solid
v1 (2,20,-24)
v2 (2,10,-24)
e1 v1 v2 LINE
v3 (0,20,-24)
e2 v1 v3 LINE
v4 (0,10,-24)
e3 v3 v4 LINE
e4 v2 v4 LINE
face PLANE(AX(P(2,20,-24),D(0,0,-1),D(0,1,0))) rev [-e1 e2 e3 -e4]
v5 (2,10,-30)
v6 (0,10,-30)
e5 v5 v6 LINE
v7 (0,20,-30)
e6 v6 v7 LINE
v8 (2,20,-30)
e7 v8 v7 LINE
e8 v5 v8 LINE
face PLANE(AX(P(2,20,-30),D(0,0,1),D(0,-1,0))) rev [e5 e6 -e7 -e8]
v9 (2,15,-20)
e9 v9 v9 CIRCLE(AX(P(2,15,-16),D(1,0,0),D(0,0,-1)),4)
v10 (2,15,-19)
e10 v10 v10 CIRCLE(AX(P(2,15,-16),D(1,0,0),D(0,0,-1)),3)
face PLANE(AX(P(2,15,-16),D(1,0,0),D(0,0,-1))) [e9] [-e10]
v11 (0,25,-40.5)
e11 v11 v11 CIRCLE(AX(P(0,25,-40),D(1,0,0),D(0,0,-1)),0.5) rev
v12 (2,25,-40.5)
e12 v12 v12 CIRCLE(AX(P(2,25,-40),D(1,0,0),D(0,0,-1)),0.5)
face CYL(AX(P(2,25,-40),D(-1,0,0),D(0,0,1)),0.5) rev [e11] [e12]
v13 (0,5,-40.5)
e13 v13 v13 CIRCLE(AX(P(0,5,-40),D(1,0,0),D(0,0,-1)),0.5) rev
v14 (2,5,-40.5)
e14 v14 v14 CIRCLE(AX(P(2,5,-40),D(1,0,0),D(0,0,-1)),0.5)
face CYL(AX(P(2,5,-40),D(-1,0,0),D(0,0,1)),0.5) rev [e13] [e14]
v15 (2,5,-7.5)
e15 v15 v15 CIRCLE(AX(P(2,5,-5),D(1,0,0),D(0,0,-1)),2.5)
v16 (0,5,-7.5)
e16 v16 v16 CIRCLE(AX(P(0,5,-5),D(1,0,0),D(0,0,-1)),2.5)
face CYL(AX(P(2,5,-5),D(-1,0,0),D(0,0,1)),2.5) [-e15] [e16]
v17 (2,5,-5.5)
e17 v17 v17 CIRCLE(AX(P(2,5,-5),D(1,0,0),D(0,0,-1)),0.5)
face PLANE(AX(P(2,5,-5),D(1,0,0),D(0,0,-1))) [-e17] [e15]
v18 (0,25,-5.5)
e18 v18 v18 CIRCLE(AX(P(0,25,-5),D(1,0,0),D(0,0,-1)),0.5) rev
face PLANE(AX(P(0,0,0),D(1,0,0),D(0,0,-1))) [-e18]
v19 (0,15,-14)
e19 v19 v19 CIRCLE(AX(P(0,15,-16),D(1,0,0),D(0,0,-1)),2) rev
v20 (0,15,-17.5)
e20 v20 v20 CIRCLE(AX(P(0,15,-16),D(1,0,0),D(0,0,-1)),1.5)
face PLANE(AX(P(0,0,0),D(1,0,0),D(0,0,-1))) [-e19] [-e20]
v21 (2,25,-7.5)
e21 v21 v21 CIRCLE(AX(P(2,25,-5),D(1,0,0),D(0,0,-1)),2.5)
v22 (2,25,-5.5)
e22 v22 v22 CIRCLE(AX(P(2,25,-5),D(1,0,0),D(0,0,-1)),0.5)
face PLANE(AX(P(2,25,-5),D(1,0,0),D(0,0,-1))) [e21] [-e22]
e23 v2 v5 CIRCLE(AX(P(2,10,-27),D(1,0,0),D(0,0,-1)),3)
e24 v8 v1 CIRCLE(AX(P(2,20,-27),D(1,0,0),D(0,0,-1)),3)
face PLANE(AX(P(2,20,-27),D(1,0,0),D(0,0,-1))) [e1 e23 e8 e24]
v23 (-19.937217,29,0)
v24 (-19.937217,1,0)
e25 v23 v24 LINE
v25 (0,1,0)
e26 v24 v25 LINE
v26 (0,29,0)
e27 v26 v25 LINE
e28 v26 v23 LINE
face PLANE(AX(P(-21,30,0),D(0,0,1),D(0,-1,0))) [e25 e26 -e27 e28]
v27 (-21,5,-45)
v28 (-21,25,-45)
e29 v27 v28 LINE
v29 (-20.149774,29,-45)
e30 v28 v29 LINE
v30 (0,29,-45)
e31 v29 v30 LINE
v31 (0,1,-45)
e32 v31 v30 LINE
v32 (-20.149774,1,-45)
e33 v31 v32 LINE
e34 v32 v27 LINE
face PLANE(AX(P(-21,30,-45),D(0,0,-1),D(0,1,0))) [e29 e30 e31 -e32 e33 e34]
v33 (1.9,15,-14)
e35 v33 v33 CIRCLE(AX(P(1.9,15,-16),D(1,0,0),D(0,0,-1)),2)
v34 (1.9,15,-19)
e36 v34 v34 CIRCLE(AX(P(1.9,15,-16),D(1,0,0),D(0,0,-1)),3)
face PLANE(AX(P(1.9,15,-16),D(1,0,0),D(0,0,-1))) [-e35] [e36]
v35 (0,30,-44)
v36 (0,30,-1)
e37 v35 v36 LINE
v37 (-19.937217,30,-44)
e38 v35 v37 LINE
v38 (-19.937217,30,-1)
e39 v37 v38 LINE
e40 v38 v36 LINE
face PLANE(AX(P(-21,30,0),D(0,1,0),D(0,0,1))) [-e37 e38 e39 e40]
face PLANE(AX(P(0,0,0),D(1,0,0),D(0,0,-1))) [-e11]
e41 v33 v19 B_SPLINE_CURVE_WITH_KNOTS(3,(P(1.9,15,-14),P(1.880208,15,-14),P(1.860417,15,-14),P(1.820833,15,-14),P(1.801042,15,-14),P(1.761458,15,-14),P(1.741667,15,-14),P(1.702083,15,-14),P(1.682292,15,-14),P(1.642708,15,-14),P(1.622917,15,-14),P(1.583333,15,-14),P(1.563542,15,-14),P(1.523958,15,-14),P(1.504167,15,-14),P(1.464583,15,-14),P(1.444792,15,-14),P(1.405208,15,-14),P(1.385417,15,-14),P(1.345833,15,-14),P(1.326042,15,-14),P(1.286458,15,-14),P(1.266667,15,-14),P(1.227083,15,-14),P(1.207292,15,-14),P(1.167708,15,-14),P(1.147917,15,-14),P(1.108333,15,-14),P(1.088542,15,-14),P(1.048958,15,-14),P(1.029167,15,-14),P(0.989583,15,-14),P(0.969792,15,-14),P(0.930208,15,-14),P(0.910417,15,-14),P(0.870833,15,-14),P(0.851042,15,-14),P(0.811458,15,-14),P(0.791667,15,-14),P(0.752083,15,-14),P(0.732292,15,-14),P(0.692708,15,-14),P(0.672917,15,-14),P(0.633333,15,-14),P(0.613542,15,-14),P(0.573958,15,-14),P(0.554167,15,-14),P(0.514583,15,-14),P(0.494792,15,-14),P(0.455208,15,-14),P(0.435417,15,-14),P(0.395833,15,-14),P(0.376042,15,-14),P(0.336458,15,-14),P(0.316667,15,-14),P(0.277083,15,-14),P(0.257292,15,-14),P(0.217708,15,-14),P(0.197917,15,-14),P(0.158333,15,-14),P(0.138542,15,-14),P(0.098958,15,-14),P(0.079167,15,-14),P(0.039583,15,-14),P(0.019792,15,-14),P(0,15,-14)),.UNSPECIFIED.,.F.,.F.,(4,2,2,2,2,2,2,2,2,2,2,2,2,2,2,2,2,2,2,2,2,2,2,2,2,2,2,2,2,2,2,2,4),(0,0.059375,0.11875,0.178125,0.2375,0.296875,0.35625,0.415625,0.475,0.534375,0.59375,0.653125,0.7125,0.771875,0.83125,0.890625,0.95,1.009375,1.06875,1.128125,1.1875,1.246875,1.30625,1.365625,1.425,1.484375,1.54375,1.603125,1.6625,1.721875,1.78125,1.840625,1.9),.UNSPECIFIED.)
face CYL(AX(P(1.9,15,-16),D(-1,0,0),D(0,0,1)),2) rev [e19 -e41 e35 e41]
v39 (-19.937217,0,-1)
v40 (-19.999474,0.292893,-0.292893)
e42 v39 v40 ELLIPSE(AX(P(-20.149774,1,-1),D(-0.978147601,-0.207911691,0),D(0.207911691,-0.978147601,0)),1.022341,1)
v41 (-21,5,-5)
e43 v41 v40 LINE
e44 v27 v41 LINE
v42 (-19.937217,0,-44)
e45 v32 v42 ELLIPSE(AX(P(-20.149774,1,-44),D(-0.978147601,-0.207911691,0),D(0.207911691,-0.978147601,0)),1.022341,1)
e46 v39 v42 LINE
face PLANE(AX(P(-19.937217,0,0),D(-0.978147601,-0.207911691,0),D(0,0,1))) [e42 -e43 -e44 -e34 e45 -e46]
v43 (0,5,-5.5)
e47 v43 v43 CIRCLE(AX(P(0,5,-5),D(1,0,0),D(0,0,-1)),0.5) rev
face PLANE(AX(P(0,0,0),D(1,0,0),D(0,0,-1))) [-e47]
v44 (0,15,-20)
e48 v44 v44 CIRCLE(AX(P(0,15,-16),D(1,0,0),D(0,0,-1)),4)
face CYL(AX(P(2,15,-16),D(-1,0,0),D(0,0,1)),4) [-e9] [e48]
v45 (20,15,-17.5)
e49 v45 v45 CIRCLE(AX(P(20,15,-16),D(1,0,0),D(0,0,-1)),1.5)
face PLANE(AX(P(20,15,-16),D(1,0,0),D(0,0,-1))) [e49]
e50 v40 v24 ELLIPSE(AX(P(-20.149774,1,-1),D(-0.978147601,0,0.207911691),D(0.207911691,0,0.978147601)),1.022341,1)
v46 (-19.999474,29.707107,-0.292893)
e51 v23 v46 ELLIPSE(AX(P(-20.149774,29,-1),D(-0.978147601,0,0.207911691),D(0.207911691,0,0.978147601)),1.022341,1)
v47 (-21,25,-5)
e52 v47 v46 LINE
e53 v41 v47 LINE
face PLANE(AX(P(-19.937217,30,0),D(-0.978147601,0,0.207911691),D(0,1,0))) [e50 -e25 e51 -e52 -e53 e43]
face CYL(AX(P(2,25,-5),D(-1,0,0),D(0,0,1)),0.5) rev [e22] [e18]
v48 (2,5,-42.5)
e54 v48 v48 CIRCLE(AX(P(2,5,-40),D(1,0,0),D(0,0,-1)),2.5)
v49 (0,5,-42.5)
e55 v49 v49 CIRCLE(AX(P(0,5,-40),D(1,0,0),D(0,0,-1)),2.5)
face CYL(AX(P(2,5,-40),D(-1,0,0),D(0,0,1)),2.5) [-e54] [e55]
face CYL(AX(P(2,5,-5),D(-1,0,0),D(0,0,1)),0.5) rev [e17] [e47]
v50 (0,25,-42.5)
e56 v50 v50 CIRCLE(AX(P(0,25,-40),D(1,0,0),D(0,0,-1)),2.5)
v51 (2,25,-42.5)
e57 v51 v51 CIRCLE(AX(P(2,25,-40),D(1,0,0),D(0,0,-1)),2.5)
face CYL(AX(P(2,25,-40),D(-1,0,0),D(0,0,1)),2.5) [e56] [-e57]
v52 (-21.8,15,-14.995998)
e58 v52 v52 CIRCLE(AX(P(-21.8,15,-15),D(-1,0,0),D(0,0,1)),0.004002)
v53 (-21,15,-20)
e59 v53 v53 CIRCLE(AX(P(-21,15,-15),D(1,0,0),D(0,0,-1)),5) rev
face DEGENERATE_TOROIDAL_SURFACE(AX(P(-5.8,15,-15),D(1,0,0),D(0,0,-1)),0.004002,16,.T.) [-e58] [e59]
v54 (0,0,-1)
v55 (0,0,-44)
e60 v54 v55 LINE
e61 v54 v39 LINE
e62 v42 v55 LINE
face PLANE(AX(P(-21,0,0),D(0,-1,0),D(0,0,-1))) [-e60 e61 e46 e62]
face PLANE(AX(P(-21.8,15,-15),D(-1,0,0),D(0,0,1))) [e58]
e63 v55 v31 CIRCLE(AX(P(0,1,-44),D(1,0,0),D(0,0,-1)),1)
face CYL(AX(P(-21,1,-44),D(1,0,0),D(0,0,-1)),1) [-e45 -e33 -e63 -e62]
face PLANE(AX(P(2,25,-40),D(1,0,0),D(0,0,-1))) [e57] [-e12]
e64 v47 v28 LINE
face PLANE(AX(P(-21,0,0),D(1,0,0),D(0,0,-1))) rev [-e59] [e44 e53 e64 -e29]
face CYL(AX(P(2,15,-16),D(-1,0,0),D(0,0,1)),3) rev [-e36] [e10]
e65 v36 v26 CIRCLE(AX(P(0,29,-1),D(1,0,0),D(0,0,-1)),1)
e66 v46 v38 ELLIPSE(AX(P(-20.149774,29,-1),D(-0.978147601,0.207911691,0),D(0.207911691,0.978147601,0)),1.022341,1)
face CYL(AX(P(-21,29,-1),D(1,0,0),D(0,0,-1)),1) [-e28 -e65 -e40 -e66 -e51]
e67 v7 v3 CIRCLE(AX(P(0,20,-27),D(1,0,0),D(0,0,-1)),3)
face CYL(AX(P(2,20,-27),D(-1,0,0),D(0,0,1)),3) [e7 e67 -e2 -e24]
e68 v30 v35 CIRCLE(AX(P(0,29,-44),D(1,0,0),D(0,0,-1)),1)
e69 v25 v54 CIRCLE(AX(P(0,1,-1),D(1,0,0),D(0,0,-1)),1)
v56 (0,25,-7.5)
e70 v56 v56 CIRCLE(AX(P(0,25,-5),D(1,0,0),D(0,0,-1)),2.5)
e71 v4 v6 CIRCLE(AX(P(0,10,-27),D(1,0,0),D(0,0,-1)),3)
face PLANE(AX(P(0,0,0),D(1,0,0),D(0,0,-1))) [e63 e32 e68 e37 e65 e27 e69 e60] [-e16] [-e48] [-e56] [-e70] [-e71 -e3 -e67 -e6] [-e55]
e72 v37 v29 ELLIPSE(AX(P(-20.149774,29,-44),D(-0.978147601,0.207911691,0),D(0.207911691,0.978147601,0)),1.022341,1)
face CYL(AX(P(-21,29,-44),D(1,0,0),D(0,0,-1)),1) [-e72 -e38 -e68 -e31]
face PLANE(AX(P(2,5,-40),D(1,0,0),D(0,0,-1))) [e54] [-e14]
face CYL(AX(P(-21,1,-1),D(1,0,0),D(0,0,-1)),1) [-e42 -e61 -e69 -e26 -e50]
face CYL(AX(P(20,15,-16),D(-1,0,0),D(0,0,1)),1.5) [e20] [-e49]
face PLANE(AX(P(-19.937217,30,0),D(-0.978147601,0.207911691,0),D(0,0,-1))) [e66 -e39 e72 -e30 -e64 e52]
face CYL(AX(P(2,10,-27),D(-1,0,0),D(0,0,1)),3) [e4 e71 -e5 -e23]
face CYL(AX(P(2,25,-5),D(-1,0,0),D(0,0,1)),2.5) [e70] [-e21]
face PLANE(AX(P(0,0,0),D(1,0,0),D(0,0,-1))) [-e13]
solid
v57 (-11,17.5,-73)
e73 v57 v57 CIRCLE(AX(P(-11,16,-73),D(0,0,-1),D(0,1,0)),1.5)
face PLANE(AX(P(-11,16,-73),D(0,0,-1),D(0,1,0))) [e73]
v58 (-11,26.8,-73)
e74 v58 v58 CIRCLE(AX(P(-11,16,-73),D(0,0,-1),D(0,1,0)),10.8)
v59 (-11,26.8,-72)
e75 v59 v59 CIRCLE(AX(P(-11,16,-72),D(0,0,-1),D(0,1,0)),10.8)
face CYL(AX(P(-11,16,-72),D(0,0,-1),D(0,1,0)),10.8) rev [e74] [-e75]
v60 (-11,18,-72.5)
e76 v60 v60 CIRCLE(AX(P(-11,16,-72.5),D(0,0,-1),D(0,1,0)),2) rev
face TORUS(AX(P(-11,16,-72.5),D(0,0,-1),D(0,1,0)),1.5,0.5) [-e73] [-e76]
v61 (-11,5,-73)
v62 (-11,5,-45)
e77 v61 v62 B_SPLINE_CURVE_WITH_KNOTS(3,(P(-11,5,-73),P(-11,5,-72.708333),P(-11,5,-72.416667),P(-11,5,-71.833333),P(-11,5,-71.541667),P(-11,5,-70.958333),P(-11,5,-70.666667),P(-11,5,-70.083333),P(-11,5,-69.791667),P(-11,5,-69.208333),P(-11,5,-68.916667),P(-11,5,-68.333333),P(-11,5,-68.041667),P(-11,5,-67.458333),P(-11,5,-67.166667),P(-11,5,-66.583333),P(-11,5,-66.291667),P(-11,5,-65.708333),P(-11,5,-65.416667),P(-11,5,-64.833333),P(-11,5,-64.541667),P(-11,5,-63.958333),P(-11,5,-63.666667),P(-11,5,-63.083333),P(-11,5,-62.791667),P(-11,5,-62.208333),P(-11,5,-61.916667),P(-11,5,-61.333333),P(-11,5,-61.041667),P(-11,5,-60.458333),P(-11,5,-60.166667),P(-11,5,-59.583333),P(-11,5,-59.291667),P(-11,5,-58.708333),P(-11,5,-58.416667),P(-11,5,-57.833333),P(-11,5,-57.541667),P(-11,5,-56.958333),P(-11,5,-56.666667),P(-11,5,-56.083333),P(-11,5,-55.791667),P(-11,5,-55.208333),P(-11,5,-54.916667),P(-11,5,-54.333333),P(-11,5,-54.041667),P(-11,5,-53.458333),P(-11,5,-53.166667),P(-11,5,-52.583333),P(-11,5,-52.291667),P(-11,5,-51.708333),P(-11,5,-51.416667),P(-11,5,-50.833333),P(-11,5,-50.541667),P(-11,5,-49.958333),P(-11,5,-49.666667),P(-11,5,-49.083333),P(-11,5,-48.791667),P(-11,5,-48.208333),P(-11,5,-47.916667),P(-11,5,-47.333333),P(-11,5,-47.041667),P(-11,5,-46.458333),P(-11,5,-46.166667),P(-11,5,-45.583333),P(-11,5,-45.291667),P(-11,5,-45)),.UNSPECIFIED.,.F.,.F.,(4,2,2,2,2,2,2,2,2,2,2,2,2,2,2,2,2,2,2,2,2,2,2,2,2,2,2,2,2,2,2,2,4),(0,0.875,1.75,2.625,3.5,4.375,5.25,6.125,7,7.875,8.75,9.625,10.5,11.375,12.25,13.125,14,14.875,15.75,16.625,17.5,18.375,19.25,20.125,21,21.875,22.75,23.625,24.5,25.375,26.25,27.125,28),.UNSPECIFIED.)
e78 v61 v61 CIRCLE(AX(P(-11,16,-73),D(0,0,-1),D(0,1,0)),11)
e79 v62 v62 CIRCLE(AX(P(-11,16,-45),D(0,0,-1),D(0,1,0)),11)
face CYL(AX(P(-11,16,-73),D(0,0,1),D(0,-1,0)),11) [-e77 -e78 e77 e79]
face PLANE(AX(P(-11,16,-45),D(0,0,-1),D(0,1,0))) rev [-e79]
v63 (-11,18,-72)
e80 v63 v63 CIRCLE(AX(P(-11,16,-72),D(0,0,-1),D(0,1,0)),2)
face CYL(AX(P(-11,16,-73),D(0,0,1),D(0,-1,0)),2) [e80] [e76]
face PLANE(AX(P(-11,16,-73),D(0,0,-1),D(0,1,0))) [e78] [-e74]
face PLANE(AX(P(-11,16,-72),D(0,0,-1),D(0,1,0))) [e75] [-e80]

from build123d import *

# Parameters (mm, degrees)
SKETCH1_W           = 45
SKETCH1_H           = 30
BOSS_EXTRUDE1_DEPTH = 21
SKETCH2_R           = 2.5
SKETCH2_R_2         = 0.5
SKETCH2_R_3         = 4
SKETCH2_R_4         = 3
BOSS_EXTRUDE2_DEPTH = 2
SKETCH3_R           = 3
SKETCH3_R_2         = 2
BOSS_EXTRUDE3_DEPTH = 1.9
SKETCH4_R           = 1.5
BOSS_EXTRUDE4_DEPTH = 20
BOSS_EXTRUDE5_DEPTH = 2
CHAMFER1_SIZE       = 5
CHAMFER1_SIZE2      = 1.062782808
SKETCH7_R           = 5
BOSS_EXTRUDE6_DEPTH = 0.8
FILLET2_R           = 16
SKETCH8_R           = 11
BOSS_EXTRUDE7_DEPTH = 28
SKETCH9_R           = 10.8
CUT_EXTRUDE1_DEPTH  = 1
SKETCH10_R          = 2
BOSS_EXTRUDE8_DEPTH = 1
FILLET3_R           = 0.5
FILLET4_R           = 1


with BuildPart() as part:
    # Sketch1 → Boss-Extrude1 (new body)
    with BuildSketch(Plane(origin=(0, 0, 0), x_dir=(0, 0, -1), z_dir=(1, 0, 0))):
        with Locations((22.5, 15)):
            Rectangle(SKETCH1_W, SKETCH1_H)
    extrude(amount=-BOSS_EXTRUDE1_DEPTH)

    # Sketch2 → Boss-Extrude2 (add)
    # profile 1 of 5: a face of its own
    with BuildSketch(Plane(origin=(0, 0, 0), x_dir=(0, 0, -1), z_dir=(1, 0, 0))):
        with Locations((5, 25)):
            Circle(SKETCH2_R)
        with Locations((5, 25)):
            Circle(SKETCH2_R_2, mode=Mode.SUBTRACT)
    # profile 2 of 5: a face of its own
    with BuildSketch(Plane(origin=(0, 0, 0), x_dir=(0, 0, -1), z_dir=(1, 0, 0))):
        with Locations((5, 5)):
            Circle(SKETCH2_R)
        with Locations((5, 5)):
            Circle(SKETCH2_R_2, mode=Mode.SUBTRACT)
    # profile 3 of 5: a face of its own
    with BuildSketch(Plane(origin=(0, 0, 0), x_dir=(0, 0, -1), z_dir=(1, 0, 0))):
        with Locations((40, 5)):
            Circle(SKETCH2_R)
        with Locations((40, 5)):
            Circle(SKETCH2_R_2, mode=Mode.SUBTRACT)
    # profile 4 of 5: a face of its own
    with BuildSketch(Plane(origin=(0, 0, 0), x_dir=(0, 0, -1), z_dir=(1, 0, 0))):
        with Locations((40, 25)):
            Circle(SKETCH2_R)
        with Locations((40, 25)):
            Circle(SKETCH2_R_2, mode=Mode.SUBTRACT)
    # profile 5 of 5: a face of its own
    with BuildSketch(Plane(origin=(0, 0, 0), x_dir=(0, 0, -1), z_dir=(1, 0, 0))):
        with Locations((16, 15)):
            Circle(SKETCH2_R_3)
        with Locations((16, 15)):
            Circle(SKETCH2_R_4, mode=Mode.SUBTRACT)
    extrude(amount=BOSS_EXTRUDE2_DEPTH)



with BuildPart() as body_2:
    # Sketch3 → Boss-Extrude3 (new body)
    with BuildSketch(Plane(origin=(0, 0, 0), x_dir=(0, 0, -1), z_dir=(1, 0, 0))):
        with Locations((16, 15)):
            Circle(SKETCH3_R)
        with Locations(Location((16, 15, 0), (0, 0, 180))):
            Circle(SKETCH3_R_2, mode=Mode.SUBTRACT)
    extrude(amount=BOSS_EXTRUDE3_DEPTH)


with BuildPart() as part_1:
    add(part.part)

    add(body_2.part)  # Boss-Extrude4 merges body 2
    # Sketch4 → Boss-Extrude4 (add)
    with BuildSketch(Plane(origin=(0, 0, 0), x_dir=(0, 0, -1), z_dir=(1, 0, 0))):
        with Locations((16, 15)):
            Circle(SKETCH4_R)
    extrude(amount=BOSS_EXTRUDE4_DEPTH)

    # Sketch6 → Boss-Extrude5 (add)
    with BuildSketch(Plane(origin=(0, 0, 0), x_dir=(0, 0, -1), z_dir=(1, 0, 0))):
        with BuildLine():
            Line((30, 20), (30, 10))
            ThreePointArc((30, 10), (27, 7), (24, 10))
            Line((24, 10), (24, 20))
            ThreePointArc((24, 20), (27, 23), (30, 20))
        make_face()
    extrude(amount=BOSS_EXTRUDE5_DEPTH)

    # Chamfer1
    chamfer1_edges = [part_1.edges().sort_by_distance(p)[0] for p in [
        (-21, 30, -22.5),
        (-21, 15, 0),
        (-21, 0, -22.5),
    ]]
    chamfer1_side = [part_1.faces().sort_by_distance(p)[0] for p in [
        (-21, 15, -22.5),
    ]]
    chamfer(chamfer1_edges, length=CHAMFER1_SIZE, length2=CHAMFER1_SIZE2, reference=chamfer1_side[0])

    # Sketch7 → Boss-Extrude6 (add)
    with BuildSketch(Plane.ZY.offset(21)):
        with Locations(Location((-15, 15, 0), (0, 0, 180))):
            Circle(SKETCH7_R)
    extrude(amount=BOSS_EXTRUDE6_DEPTH)

    # Fillet2
    # the kernel refuses this fillet: 16 mm, written as the material it takes off along each edge
    with BuildSketch(Plane(origin=(-21.8, 15, -15), x_dir=(0, 0, -1), z_dir=(0, 1, 0))) as fillet2_piece_1:
        with BuildLine():
            CenterArc((0.004001601, -16), FILLET2_R, 71.805127661, 18.194872339)
            Line((0.004001601, 0), (0.004001601, 0.32))
            Line((0.004001601, 0.32), (5, 0.32))
            Line((5, 0.32), (5.32, 0))
            ThreePointArc((5.32, 0), (5.32, -0.4), (5.099919968, -0.496))
            Line((5.099919968, -0.496), (5, -0.8))
        make_face()
    revolve(axis=Axis((-21.8, 15, -15), (-1, 0, 0)), mode=Mode.SUBTRACT)

    # Fillet4
    fillet4_edges = [part_1.edges().sort_by_distance(p)[0] for p in [
        (-9.968608596, 30, -45),
        (-9.968608596, 30, 0),
        (-9.968608596, 0, -45),
        (-9.968608596, 0, 0),
    ]]
    fillet(fillet4_edges, radius=FILLET4_R)


with BuildPart() as body_2_2:
    # Sketch8 → Boss-Extrude7 (new body)
    with BuildSketch(Plane(origin=(0, 0, -45), x_dir=(-1, 0, 0), z_dir=(0, 0, -1))):
        with Locations(Location((11, 16, 0), (0, 0, 270))):
            Circle(SKETCH8_R)
    extrude(amount=BOSS_EXTRUDE7_DEPTH)

    # Sketch9 → Cut-Extrude1 (cut)
    with BuildSketch(Plane(origin=(0, 0, -73), x_dir=(-1, 0, 0), z_dir=(0, 0, -1))):
        with Locations(Location((11, 16, 0), (0, 0, 90))):
            Circle(SKETCH9_R)
    extrude(amount=-CUT_EXTRUDE1_DEPTH, mode=Mode.SUBTRACT)

    # Sketch10 → Boss-Extrude8 (add)
    with BuildSketch(Plane(origin=(0, 0, -72), x_dir=(-1, 0, 0), z_dir=(0, 0, -1))):
        with Locations(Location((11, 16, 0), (0, 0, 90))):
            Circle(SKETCH10_R)
    extrude(amount=BOSS_EXTRUDE8_DEPTH)

    # Fillet3
    fillet3_edges = [body_2_2.edges().sort_by_distance(p)[0] for p in [
        (-11, 14, -73),
    ]]
    fillet(fillet3_edges, radius=FILLET3_R)


solid = Compound([part_1.part, body_2_2.part])
